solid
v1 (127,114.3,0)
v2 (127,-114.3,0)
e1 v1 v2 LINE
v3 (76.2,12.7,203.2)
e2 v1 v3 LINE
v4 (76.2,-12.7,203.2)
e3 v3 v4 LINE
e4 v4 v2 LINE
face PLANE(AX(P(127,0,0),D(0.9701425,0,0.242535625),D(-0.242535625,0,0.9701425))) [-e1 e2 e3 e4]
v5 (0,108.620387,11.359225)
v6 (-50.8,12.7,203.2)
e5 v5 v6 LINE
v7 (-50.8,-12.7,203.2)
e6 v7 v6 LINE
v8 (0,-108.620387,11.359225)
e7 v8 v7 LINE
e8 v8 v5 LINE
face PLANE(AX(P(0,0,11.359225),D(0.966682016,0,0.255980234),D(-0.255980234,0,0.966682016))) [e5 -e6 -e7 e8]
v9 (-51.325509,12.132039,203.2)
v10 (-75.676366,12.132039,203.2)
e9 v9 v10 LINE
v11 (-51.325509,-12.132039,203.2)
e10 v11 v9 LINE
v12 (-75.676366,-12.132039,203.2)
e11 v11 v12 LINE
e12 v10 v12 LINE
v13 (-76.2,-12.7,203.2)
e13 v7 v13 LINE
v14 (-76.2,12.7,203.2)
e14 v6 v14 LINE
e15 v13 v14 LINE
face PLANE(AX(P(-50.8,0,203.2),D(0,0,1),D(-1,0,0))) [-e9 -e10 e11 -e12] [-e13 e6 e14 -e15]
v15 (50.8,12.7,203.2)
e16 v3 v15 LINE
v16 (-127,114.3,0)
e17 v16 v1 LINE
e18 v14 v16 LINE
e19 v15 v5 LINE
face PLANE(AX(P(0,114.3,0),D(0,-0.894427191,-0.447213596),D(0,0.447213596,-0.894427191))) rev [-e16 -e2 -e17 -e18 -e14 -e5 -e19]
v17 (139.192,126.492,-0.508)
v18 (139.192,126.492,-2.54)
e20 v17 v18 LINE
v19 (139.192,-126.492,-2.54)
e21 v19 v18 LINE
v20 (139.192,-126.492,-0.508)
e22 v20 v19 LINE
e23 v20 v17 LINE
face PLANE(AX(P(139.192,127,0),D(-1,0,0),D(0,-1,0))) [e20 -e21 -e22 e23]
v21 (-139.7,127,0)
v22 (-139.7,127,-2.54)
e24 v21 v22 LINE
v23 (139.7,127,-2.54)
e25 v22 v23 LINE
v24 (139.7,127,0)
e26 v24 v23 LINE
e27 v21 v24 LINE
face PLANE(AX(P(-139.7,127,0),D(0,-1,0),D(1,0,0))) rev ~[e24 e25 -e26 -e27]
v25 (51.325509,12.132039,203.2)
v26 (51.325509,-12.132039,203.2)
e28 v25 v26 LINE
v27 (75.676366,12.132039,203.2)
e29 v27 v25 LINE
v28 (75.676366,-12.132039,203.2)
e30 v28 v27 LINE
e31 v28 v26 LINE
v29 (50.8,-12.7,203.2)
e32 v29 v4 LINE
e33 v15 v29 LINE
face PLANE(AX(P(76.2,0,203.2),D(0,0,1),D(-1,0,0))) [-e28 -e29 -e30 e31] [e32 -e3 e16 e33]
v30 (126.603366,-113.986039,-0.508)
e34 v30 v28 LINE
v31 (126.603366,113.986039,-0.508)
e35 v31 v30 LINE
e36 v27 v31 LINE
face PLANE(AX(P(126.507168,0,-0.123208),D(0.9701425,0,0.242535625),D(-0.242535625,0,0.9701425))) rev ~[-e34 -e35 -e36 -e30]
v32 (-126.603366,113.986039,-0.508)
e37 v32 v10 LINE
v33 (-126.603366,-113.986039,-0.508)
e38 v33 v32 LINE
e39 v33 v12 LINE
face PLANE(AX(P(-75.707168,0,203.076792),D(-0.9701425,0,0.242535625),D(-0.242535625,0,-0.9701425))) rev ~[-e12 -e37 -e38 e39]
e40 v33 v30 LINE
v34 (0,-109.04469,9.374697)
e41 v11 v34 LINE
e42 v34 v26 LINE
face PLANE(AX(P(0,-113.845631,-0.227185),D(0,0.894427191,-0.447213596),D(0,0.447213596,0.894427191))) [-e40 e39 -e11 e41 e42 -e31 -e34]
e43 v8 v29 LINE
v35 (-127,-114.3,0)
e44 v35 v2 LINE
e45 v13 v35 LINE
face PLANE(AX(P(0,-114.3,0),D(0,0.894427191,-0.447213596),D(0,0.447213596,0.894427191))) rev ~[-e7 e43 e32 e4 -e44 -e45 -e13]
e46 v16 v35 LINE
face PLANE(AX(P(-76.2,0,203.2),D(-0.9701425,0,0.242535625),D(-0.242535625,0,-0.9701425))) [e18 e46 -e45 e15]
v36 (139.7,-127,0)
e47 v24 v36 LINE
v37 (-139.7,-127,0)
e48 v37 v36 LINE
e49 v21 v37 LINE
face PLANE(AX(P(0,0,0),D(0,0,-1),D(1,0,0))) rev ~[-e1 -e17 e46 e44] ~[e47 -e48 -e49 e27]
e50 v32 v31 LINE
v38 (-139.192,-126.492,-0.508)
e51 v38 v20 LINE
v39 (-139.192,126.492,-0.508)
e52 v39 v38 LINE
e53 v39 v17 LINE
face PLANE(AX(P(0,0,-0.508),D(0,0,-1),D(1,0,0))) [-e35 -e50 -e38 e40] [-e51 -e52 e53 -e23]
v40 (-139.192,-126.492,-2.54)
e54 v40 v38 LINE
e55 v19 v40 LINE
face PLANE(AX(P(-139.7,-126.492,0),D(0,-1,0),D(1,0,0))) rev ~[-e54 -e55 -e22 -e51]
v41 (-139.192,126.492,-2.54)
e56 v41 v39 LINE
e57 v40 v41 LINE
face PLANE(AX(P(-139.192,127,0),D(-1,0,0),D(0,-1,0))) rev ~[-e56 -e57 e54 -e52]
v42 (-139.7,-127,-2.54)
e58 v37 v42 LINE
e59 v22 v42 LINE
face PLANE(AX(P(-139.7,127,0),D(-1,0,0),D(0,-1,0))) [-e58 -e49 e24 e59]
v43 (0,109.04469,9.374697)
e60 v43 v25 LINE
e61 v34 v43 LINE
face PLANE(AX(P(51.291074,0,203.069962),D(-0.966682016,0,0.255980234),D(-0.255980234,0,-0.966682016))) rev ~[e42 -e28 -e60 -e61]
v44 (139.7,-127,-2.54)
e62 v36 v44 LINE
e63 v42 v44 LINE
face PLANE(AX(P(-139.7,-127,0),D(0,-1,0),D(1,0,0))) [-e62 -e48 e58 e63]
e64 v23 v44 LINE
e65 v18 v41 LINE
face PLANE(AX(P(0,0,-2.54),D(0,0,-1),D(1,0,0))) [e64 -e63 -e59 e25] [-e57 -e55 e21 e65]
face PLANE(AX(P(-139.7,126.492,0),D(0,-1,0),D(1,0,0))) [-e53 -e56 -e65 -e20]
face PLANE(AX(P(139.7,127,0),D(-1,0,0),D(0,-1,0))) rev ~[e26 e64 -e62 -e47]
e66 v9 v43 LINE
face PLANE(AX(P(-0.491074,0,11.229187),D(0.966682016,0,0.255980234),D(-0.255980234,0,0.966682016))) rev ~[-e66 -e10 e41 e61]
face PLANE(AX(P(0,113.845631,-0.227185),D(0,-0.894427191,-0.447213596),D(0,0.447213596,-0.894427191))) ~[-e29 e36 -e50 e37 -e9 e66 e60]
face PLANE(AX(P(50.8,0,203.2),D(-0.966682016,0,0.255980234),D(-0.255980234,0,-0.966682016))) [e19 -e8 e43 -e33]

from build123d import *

# Parameters (mm, degrees)
F6_DEPTH      = 114.3
F6_DEPTH_BACK = 114.3
F8_DEPTH      = 127.001
F8_DEPTH_BACK = 127.001
F9_W          = 279.4
F9_H          = 254
F10_DEPTH     = 2.54
F11_T         = -0.508


# Not quite as in the source:
# - a pattern or mirror of a feature is missing from the dataset's text; its kind, count and spacing are read off the source's solid


with BuildPart() as f6:
    # F5 (on Front) → F6 (new body, two sides)
    with BuildSketch(Plane.XZ) as f6_sk:
        Polygon((-76.2, 203.2), (-127, 0), (127, 0), (76.2, 203.2), (50.8, 203.2), (0, 11.3592253257), (-50.8, 203.2), align=None)
    extrude(amount=F6_DEPTH)
    extrude(f6_sk.sketch, amount=-F6_DEPTH_BACK)

    # F7 (on Right) → F8 (cut, two sides)
    with BuildSketch(Plane.YZ) as f8_sk:
        Polygon((-114.3, 203.2), (-114.3, 0), (-12.7, 203.2), align=None)
    f8 = extrude(amount=-F8_DEPTH, mode=Mode.SUBTRACT) + extrude(f8_sk.sketch, amount=F8_DEPTH_BACK, mode=Mode.SUBTRACT)

    # F8_copies: F8 across plane
    add(f8.mirror(Plane.ZX), mode=Mode.SUBTRACT)

    # F9 (on face) → F10 (join)
    with BuildSketch(Plane(origin=(0, 0, 0), x_dir=(1, 0, 0), z_dir=(0, 0, -1))):
        Rectangle(F9_W, F9_H)
    extrude(amount=F10_DEPTH)

    # F11
    f11_openings = [f6.faces().sort_by_distance(p)[0] for p in [
        (0, 0, -2.54),
        (63.5, 0, 203.2),
        (-63.5, 0, 203.2),
    ]]
    offset(amount=F11_T, openings=f11_openings, kind=Kind.INTERSECTION)


solid = f6.part
